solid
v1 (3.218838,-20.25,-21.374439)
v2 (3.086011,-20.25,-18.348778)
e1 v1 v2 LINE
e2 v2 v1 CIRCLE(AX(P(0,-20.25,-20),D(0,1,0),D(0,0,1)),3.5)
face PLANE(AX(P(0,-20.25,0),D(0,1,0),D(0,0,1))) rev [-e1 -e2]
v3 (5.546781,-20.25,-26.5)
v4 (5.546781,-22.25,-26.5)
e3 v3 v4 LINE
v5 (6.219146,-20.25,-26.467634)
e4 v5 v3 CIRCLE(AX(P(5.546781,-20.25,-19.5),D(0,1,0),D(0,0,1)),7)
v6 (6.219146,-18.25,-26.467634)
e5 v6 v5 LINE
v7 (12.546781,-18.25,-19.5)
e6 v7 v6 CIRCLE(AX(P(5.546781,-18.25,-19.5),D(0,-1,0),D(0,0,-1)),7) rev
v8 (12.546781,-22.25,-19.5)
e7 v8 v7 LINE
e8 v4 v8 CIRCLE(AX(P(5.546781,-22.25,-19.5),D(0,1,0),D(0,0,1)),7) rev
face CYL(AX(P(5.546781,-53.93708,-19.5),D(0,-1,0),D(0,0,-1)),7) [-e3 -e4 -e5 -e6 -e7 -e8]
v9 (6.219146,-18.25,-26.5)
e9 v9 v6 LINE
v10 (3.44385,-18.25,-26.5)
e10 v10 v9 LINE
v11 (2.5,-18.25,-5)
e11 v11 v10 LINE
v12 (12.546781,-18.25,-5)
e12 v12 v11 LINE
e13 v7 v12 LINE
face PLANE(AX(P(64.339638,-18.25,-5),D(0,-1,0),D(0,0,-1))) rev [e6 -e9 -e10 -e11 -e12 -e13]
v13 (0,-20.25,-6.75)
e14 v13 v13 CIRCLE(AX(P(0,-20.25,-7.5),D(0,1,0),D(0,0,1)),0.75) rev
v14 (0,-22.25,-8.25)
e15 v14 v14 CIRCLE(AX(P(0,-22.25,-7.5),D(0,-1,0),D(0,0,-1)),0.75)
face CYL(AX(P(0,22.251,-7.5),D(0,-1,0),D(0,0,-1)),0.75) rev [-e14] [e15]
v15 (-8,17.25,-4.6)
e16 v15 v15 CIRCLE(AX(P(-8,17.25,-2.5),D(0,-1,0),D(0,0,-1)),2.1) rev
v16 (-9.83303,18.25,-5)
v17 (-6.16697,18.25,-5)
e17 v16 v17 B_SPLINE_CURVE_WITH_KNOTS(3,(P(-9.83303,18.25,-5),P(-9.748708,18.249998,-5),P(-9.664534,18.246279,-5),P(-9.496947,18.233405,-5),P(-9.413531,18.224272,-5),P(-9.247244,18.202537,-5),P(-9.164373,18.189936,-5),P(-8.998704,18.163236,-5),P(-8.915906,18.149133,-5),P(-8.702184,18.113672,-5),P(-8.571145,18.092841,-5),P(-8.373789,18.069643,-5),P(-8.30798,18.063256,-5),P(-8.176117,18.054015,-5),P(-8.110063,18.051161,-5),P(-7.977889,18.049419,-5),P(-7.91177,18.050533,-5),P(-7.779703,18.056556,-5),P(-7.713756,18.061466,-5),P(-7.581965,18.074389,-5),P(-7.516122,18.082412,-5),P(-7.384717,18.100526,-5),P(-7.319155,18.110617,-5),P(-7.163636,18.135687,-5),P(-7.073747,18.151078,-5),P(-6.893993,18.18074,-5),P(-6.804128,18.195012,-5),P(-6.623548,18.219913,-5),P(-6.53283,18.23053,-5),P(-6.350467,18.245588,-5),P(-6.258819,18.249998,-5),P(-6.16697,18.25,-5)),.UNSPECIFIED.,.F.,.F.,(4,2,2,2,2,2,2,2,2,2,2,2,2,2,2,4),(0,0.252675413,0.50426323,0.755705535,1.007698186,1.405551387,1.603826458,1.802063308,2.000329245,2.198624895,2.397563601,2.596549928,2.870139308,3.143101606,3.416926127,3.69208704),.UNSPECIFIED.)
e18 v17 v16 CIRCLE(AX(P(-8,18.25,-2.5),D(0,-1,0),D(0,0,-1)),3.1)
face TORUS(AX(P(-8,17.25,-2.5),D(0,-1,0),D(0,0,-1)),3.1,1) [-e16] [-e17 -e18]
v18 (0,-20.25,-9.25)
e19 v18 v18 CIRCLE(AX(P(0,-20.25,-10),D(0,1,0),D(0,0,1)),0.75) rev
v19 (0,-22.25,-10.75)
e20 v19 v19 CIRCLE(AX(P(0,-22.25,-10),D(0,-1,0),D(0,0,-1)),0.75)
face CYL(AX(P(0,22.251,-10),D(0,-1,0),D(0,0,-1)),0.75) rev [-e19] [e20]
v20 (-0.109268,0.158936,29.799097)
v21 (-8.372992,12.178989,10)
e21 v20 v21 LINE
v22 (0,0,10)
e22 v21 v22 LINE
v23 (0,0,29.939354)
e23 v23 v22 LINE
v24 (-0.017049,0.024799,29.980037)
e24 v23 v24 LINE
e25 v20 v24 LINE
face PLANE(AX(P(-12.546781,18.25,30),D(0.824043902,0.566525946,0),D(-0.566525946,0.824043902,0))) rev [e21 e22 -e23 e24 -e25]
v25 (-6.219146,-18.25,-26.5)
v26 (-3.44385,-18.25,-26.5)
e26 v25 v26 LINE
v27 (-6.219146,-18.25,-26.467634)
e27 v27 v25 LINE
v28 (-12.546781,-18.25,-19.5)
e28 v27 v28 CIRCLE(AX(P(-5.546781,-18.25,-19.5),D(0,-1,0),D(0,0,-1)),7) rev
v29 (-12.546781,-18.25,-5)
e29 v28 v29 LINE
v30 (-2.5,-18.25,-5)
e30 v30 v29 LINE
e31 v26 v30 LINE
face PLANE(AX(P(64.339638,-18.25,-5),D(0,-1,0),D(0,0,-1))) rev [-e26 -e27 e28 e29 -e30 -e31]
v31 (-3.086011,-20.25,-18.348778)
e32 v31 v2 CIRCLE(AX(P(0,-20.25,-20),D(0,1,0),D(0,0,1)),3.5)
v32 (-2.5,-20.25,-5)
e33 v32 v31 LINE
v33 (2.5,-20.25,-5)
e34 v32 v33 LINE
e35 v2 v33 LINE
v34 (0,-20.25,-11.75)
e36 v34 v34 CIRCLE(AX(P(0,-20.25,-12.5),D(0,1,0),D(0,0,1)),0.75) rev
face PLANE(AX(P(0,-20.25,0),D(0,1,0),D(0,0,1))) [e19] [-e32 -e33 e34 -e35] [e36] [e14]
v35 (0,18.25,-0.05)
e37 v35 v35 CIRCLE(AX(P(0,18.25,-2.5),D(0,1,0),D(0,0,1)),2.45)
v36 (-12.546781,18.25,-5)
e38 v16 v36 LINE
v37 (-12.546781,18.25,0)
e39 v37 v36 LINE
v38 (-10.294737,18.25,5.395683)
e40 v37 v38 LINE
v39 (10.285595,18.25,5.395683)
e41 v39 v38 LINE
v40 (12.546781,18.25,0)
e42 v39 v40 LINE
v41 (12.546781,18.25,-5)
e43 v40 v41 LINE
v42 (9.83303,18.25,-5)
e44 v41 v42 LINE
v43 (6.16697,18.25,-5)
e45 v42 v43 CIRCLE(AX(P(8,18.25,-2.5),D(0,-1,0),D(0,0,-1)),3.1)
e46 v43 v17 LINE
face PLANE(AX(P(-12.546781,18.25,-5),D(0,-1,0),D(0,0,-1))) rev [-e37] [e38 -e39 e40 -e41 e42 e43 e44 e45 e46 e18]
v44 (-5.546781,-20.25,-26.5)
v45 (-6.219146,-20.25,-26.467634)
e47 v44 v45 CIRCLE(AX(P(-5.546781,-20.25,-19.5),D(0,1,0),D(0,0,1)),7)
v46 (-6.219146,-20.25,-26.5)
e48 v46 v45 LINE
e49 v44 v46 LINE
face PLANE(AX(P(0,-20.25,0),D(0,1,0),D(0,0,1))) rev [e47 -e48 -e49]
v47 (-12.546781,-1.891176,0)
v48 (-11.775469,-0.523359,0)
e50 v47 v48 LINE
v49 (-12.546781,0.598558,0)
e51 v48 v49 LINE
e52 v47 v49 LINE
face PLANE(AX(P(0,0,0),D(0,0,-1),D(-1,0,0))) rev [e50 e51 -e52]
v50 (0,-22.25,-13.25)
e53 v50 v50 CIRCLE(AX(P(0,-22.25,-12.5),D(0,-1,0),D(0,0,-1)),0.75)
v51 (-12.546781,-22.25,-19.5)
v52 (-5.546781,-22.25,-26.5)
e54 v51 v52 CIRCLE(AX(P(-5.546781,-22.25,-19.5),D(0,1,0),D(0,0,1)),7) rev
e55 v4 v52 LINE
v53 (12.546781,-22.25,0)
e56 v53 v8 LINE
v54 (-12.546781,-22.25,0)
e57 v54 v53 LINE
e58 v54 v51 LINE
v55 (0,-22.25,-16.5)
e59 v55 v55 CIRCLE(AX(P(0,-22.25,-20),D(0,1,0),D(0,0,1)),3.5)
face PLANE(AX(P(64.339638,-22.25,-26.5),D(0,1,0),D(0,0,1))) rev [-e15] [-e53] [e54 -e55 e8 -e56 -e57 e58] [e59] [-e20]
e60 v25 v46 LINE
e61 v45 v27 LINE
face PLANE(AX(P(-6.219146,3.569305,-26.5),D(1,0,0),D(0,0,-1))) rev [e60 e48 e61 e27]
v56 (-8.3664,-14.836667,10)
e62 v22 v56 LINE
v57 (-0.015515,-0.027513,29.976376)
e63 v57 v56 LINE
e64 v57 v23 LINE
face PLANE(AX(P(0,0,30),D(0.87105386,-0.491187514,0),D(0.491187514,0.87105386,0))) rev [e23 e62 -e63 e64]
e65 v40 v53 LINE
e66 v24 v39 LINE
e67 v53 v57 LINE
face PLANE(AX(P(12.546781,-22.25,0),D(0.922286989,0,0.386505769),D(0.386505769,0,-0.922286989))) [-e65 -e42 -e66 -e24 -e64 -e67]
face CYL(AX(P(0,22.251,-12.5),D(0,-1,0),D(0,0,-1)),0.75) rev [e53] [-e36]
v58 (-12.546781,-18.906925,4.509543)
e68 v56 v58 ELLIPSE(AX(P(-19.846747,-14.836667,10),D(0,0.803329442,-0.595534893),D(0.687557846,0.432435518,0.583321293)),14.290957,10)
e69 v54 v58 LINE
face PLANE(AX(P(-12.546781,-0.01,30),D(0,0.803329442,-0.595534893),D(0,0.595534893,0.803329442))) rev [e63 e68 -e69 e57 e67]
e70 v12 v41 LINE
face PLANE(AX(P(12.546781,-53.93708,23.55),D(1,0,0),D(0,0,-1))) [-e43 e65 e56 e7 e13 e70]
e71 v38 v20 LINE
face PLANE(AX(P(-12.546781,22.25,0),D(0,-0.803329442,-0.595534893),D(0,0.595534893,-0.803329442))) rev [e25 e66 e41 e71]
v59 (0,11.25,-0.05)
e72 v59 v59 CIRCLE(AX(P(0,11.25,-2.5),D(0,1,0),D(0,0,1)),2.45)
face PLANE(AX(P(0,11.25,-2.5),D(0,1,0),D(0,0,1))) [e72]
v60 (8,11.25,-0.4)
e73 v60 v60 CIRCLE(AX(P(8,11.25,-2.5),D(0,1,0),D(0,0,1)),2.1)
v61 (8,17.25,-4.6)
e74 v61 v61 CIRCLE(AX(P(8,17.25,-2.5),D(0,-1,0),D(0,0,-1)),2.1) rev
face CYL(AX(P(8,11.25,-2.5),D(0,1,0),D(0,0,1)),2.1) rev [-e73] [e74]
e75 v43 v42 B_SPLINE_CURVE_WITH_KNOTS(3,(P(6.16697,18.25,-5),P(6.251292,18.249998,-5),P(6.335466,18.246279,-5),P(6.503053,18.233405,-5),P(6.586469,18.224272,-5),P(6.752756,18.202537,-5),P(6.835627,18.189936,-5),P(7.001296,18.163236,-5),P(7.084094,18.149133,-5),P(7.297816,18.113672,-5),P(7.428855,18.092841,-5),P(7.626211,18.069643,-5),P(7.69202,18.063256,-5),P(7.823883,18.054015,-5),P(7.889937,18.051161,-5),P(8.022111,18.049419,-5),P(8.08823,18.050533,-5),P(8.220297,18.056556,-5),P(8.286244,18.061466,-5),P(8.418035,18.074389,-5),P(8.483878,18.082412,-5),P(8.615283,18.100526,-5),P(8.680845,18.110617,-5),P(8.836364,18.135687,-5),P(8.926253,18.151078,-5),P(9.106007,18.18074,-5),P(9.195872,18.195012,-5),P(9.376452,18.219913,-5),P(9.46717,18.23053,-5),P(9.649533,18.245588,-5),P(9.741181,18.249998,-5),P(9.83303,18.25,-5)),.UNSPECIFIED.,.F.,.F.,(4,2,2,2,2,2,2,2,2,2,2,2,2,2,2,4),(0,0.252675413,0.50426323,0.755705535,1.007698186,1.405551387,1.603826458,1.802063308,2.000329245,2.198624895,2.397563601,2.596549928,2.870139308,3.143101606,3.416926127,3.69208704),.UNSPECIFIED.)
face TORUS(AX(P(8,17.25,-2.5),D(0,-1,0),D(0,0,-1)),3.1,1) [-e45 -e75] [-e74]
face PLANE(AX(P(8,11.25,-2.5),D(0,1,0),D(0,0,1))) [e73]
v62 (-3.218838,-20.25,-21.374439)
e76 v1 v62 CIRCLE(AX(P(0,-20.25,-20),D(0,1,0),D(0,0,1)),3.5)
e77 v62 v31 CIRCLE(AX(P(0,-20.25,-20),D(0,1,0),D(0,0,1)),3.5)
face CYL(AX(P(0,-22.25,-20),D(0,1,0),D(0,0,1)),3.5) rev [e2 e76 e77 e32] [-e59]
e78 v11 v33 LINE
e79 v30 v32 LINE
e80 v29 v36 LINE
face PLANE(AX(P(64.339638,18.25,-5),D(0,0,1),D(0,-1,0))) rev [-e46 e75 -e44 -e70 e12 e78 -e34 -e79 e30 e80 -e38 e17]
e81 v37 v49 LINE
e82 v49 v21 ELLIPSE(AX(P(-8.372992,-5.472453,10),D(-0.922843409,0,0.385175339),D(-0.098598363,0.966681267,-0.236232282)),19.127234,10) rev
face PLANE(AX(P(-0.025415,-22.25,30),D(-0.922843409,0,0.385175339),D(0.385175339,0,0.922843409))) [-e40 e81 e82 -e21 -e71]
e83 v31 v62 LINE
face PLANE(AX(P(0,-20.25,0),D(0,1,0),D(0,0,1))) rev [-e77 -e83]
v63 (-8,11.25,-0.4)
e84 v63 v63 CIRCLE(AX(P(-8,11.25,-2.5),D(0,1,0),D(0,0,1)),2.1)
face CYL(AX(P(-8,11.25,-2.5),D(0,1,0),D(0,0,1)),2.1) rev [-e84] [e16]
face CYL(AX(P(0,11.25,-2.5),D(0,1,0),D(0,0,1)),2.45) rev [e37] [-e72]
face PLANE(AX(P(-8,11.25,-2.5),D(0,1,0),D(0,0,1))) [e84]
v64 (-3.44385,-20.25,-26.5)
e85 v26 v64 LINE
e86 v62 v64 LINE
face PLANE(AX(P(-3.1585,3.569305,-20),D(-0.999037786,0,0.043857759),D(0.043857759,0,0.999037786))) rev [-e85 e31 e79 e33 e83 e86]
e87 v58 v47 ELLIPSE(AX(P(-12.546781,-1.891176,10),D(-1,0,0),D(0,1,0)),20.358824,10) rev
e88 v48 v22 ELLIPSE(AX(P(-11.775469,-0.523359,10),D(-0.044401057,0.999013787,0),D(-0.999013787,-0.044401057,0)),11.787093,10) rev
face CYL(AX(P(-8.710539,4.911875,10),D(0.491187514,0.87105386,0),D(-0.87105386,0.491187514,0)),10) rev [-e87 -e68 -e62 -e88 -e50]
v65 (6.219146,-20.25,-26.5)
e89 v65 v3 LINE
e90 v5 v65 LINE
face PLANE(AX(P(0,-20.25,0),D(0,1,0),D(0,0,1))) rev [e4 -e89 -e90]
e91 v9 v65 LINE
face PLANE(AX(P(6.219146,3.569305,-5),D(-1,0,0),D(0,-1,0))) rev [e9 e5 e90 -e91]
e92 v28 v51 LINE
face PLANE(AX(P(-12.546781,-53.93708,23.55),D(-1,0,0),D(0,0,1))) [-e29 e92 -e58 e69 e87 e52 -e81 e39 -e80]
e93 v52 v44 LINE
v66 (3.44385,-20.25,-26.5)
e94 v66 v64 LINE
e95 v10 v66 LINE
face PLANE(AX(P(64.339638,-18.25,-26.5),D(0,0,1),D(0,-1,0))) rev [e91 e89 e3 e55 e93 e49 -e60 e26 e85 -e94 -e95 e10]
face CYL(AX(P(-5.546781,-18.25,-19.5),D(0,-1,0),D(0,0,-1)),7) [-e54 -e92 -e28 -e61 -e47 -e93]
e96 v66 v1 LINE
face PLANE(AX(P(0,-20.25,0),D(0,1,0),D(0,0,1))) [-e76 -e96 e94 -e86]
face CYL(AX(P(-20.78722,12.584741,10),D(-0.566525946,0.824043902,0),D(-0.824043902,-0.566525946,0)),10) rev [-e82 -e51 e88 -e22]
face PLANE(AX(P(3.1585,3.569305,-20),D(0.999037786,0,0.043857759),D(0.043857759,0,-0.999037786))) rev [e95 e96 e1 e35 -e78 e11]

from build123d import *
from OCP.BRepFilletAPI import BRepFilletAPI_MakeChamfer

# Parameters (mm, degrees)
SKETCH4_W                = 12.46
SKETCH4_H                = 17.25
BOSS_EXTRUDE3_DEPTH      = 6
BOSS_EXTRUDE6_DEPTH      = 7.3
BOSS_EXTRUDE6_DEPTH_BACK = 17.25
SKETCH8_R                = 12.546781182
SKETCH8_R_2              = 11.15
BOSS_EXTRUDE4_DEPTH      = 17.25
SKETCH6_R                = 2
CUT_EXTRUDE1_DEPTH       = 5
CHAMFER1_SIZE            = 0.5
CHAMFER1_SIZE_2          = 0.866025404
SKETCH10_W               = 12.46
SKETCH10_H               = 23.7
CUT_EXTRUDE3_DEPTH       = 17.25
CUT_EXTRUDE4_REACH       = 43.938
SKETCH11_W               = 5
SKETCH11_H               = 3
BOSS_EXTRUDE7_START      = -7.3
BOSS_EXTRUDE7_DEPTH      = 7.3
BOSS_EXTRUDE9_START      = 10
BOSS_EXTRUDE9_DEPTH      = 10
BOSS_EXTRUDE10_DEPTH     = 25.093562364
SKETCH18_W               = 21.5
SKETCH18_H               = 12.438292938
CUT_EXTRUDE5_DEPTH       = 2
CUT_EXTRUDE6_DEPTH       = 58.154608998
CUT_EXTRUDE6_DEPTH_BACK  = 58.154608998
SKETCH19_R               = 3.5
FILLET1_R                = 7
CUT_EXTRUDE7_DEPTH       = 55.97840444
CUT_EXTRUDE7_DEPTH_BACK  = 55.97840444
SKETCH20_W               = 25.093562364
SKETCH20_H               = 36.096781182
BOSS_EXTRUDE11_DEPTH     = 44.5
CUT_EXTRUDE8_DEPTH       = 40.401576339
CUT_EXTRUDE8_DEPTH_BACK  = 40.401576339
CUT_EXTRUDE9_DEPTH       = 40.401576339
SKETCH24_R               = 6.5
BOSS_EXTRUDE12_DEPTH     = 5
SKETCH25_R               = 6.075
BOSS_EXTRUDE13_DEPTH     = 5
FILLET2_R                = 1
BOSS_EXTRUDE14_DEPTH     = 2
CUT_EXTRUDE10_REACH      = 57.104
SKETCH27_R               = 0.75
CUT_EXTRUDE11_DEPTH      = 45.983908275
SKETCH29_R               = 2.1
SKETCH29_R_2             = 2.45
CUT_EXTRUDE12_DEPTH      = 7
FILLET3_R                = 10
FILLET4_R                = 1


# Some blends are built 0.0001 mm under size
with BuildPart() as part:
    # Sketch4 → Boss-Extrude3 (new body)
    with BuildSketch(Plane.XY):
        with Locations((0, -1.35)):
            Rectangle(SKETCH4_W, SKETCH4_H)
    extrude(amount=BOSS_EXTRUDE3_DEPTH)



with BuildPart() as body_2:
    # Sketch8 → Boss-Extrude6 (new, two sides: drawn at the far end of the back side and taken through both)
    with BuildSketch(Plane(origin=(0, -9.975, 0), x_dir=(-1, 0, 0), z_dir=(0, -1, 0)).offset(-BOSS_EXTRUDE6_DEPTH_BACK)):
        with Locations(Location((0, -23.55, 0), (0, 0, 90))):
            Circle(SKETCH8_R)
        with Locations(Location((0, -23.55, 0), (0, 0, 90))):
            Circle(SKETCH8_R_2, mode=Mode.SUBTRACT)
    extrude(amount=BOSS_EXTRUDE6_DEPTH + BOSS_EXTRUDE6_DEPTH_BACK)


with BuildPart() as part_1:
    add(part.part)

    add(body_2.part)  # Boss-Extrude4 merges body 2
    # Sketch5 → Boss-Extrude4 (add)
    with BuildSketch(Plane(origin=(0, 7.275, 0), x_dir=(1, 0, 0), z_dir=(0, 1, 0))):
        with BuildLine():
            Line((12.546781182, -23.55), (12.546781182, 0))
            Line((12.546781182, 0), (6.23, 0))
            Line((6.23, 0), (6.23, -29.7))
            Line((6.23, -29.7), (-6.23, -29.7))
            Line((-6.23, -29.7), (-6.23, 0))
            Line((-6.23, 0), (-12.546781182, 0))
            Line((-12.546781182, 0), (-12.546781182, -23.55))
            ThreePointArc((-12.546781182, -23.55), (0, -36.096781182), (12.546781182, -23.55))
        make_face()
    extrude(amount=-BOSS_EXTRUDE4_DEPTH)

    # Sketch6 → Cut-Extrude1 (cut)
    with BuildSketch(Plane(origin=(0, 7.275, 0), x_dir=(1, 0, 0), z_dir=(0, 1, 0))):
        with Locations(Location((0, -3.5, 0), (0, 0, 270))):
            Circle(SKETCH6_R)
        with Locations(Location((0, -32.2, 0), (0, 0, 270))):
            Circle(SKETCH6_R)
    extrude(amount=-CUT_EXTRUDE1_DEPTH, mode=Mode.SUBTRACT)

    # Chamfer1
    chamfer1_edges_1 = [part_1.edges().sort_by_distance(p)[0] for p in [
        (0, 7.275, 1.5),
    ]]
    chamfer1_side_1 = [part_1.faces().sort_by_distance(p)[0] for p in [
        (0, 7.275, 1.49),
    ]]
    chamfer1_edges_2 = [part_1.edges().sort_by_distance(p)[0] for p in [
        (0, 7.275, 30.2),
    ]]
    chamfer1_side_2 = [part_1.faces().sort_by_distance(p)[0] for p in [
        (0, 7.275, 30.19),
    ]]
    chamfer1 = BRepFilletAPI_MakeChamfer(part_1.part.solid().wrapped)
    for e in chamfer1_edges_1:
        chamfer1.Add(CHAMFER1_SIZE - 0.0001, CHAMFER1_SIZE_2 - 0.0001, e.wrapped, chamfer1_side_1[0].wrapped)
    for e in chamfer1_edges_2:
        chamfer1.Add(CHAMFER1_SIZE - 0.0001, CHAMFER1_SIZE_2 - 0.0001, e.wrapped, chamfer1_side_2[0].wrapped)
    add(Compound.cast(chamfer1.Shape()), mode=Mode.REPLACE)  # a hair under: the kernel refuses the full size

    # Sketch10 → Cut-Extrude3 (cut)
    with BuildSketch(Plane(origin=(0, 7.275, 0), x_dir=(1, 0, 0), z_dir=(0, 1, 0))):
        with Locations((0, -17.85)):
            Rectangle(SKETCH10_W, SKETCH10_H)
    extrude(amount=-CUT_EXTRUDE3_DEPTH, mode=Mode.SUBTRACT)

    # Sketch11 → Cut-Extrude4 (cut, up to next)
    with BuildSketch(Plane.XY.offset(36.096781182), mode=Mode.PRIVATE) as cut_extrude4_sk1:
        with Locations((0, -8.475)):
            Rectangle(SKETCH11_W, SKETCH11_H)
    cut_extrude4_tool1 = extrude(cut_extrude4_sk1.sketch, amount=-CUT_EXTRUDE4_REACH, mode=Mode.PRIVATE) & part_1.part
    add(cut_extrude4_tool1.solids().sort_by_distance((0, -8.475, 36.096781))[0], mode=Mode.SUBTRACT)

    # Sketch13 → Boss-Extrude7 (add)
    with BuildSketch(Plane.XZ.offset(17.275).offset(BOSS_EXTRUDE7_START)):
        with BuildLine():
            Line((-12.546781182, 23.55), (-12.546781182, 0))
            Line((-12.546781182, 0), (12.546781182, 0))
            Line((12.546781182, 0), (12.546781182, 23.55))
            ThreePointArc((12.546781182, 23.55), (0, 11.003218818), (-12.546781182, 23.55))
        make_face()
    extrude(amount=BOSS_EXTRUDE7_DEPTH)

    # Sketch15 → Boss-Extrude9 (add)
    with BuildSketch(Plane(origin=(0, 7.275, 0), x_dir=(1, 0, 0), z_dir=(0, 1, 0)).offset(BOSS_EXTRUDE9_START)):
        with BuildLine():
            Line((-12.546781182, 0), (12.546781182, 0))
            Line((12.546781182, 0), (12.546781182, -23.55))
            ThreePointArc((12.546781182, -23.55), (0, -36.096781182), (-12.546781182, -23.55))
            Line((-12.546781182, -23.55), (-12.546781182, 0))
        make_face()
        with BuildLine():
            Line((-6.23, -0.8), (6.23, -0.8))
            Line((6.23, -0.8), (6.23, -33.5))
            ThreePointArc((6.23, -33.5), (5.937106781, -34.207106781), (5.23, -34.5))
            Line((5.23, -34.5), (-5.23, -34.5))
            ThreePointArc((-5.23, -34.5), (-5.937106781, -34.207106781), (-6.23, -33.5))
            Line((-6.23, -33.5), (-6.23, -0.8))
        make_face(mode=Mode.SUBTRACT)
    extrude(amount=-BOSS_EXTRUDE9_DEPTH)

    # Sketch17 → Boss-Extrude10 (add)
    with BuildSketch(Plane(origin=(-12.546781182, 4.728218818, 0), x_dir=(0, -1, 0), z_dir=(1, 0, 0))):
        Polygon((26.978218818, 26.5), (26.978218818, 0), (-17.521781182, 0), (-17.521781182, 26.5), (-13.521781182, 26.5), (-13.521781182, 5), (22.978218818, 5), (22.978218818, 26.5), align=None)
    extrude(amount=BOSS_EXTRUDE10_DEPTH)

    # Sketch18 → Cut-Extrude5 (cut)
    with BuildSketch(Plane.ZX.offset(-18.25)):
        with Locations((-15.75, 0)):
            Rectangle(SKETCH18_W, SKETCH18_H)
    extrude(amount=-CUT_EXTRUDE5_DEPTH, mode=Mode.SUBTRACT)

    # Sketch19 → Cut-Extrude6 (cut, two sides: drawn at the far end of the back side and taken through both)
    with BuildSketch(Plane.ZX.offset(-20.25).offset(-CUT_EXTRUDE6_DEPTH_BACK)):
        with Locations((-20, 0)):
            Circle(SKETCH19_R)
    extrude(amount=CUT_EXTRUDE6_DEPTH + CUT_EXTRUDE6_DEPTH_BACK, mode=Mode.SUBTRACT)

    # Fillet1
    fillet1_edges = [part_1.edges().sort_by_distance(p)[0] for p in [
        (12.546781182, -20.25, -26.5),
        (-12.546781182, -20.25, -26.5),
        (-12.546781182, 20.25, -26.5),
        (12.546781182, 20.25, -26.5),
    ]]
    fillet(fillet1_edges, radius=FILLET1_R)

    # Sketch20 → Cut-Extrude7 (cut, two sides: drawn at the far end of the back side and taken through both)
    with BuildSketch(Plane(origin=(0, 17.275, 0), x_dir=(1, 0, 0), z_dir=(0, 1, 0)).offset(-CUT_EXTRUDE7_DEPTH_BACK)):
        with Locations((0, -18.048390591)):
            Rectangle(SKETCH20_W, SKETCH20_H)
    extrude(amount=CUT_EXTRUDE7_DEPTH + CUT_EXTRUDE7_DEPTH_BACK, mode=Mode.SUBTRACT)

    # Sketch21 → Boss-Extrude11 (add)
    with BuildSketch(Plane(origin=(0, 22.25, 0), x_dir=(1, 0, 0), z_dir=(0, 1, 0))):
        Polygon((12.546781182, 0), (-0.025415104, -30), (-12.546781182, 0), align=None)
    extrude(amount=-BOSS_EXTRUDE11_DEPTH)

    # Sketch22 → Cut-Extrude8 (cut, two sides: drawn at the far end of the back side and taken through both)
    with BuildSketch(Plane(origin=(0, 0, 0), x_dir=(0, 0, -1), z_dir=(1, 0, 0)).offset(-CUT_EXTRUDE8_DEPTH_BACK)):
        Polygon((0, 22.25), (-30, 0.01), (-30, 22.25), align=None)
        Polygon((0, -22.25), (-30, -22.25), (-30, -0.01), align=None)
    extrude(amount=CUT_EXTRUDE8_DEPTH + CUT_EXTRUDE8_DEPTH_BACK, mode=Mode.SUBTRACT)

    # Sketch23 → Cut-Extrude9 (cut, through all)
    with BuildSketch(Plane(origin=(0, 0, 0), x_dir=(-1, 0, 0), z_dir=(0, 0, -1))):
        Polygon((12.546781182, 18.25), (0, 0), (12.546781182, -22.25), align=None)
    extrude(amount=-CUT_EXTRUDE9_DEPTH, mode=Mode.SUBTRACT)

    # Sketch24 → Boss-Extrude12 (add)
    with BuildSketch(Plane(origin=(0, 22.25, 0), x_dir=(1, 0, 0), z_dir=(0, 1, 0))):
        with Locations(Location((0, 20, 0), (0, 0, 270))):
            Circle(SKETCH24_R)
    extrude(amount=-BOSS_EXTRUDE12_DEPTH)

    # Sketch25 → Boss-Extrude13 (add)
    with BuildSketch(Plane.XZ.offset(-17.25)):
        with Locations(Location((0, -20, 0), (0, 0, 270))):
            Circle(SKETCH25_R)
    extrude(amount=BOSS_EXTRUDE13_DEPTH)

    # Fillet2
    fillet2_edges = [part_1.edges().sort_by_distance(p)[0] for p in [
        (0, 12.25, -13.925),
    ]]
    fillet(fillet2_edges, radius=FILLET2_R)

    # Sketch26 → Boss-Extrude14 (add)
    with BuildSketch(Plane(origin=(0, -20.25, 0), x_dir=(1, 0, 0), z_dir=(0, 1, 0))):
        Polygon((-6.219146469, 5), (-2.5, 5), (-3.1585, 20), (-3.44385, 26.5), (-6.219146469, 26.5), align=None)
        Polygon((3.1585, 20), (3.44385, 26.5), (6.219146469, 26.5), (6.219146469, 5), (2.5, 5), align=None)
    extrude(amount=BOSS_EXTRUDE14_DEPTH)

    # Sketch27 → Cut-Extrude10 (cut, up to next)
    with BuildSketch(Plane.XZ.offset(22.25), mode=Mode.PRIVATE) as cut_extrude10_sk1:
        with Locations(Location((0, -10, 0), (0, 0, 270))):
            Circle(SKETCH27_R)
    cut_extrude10_tool1 = extrude(cut_extrude10_sk1.sketch, amount=-CUT_EXTRUDE10_REACH, mode=Mode.PRIVATE) & part_1.part
    # Sketch27 → Cut-Extrude10 (cut, up to next)
    with BuildSketch(Plane.XZ.offset(22.25), mode=Mode.PRIVATE) as cut_extrude10_sk2:
        with Locations(Location((0, -7.5, 0), (0, 0, 270))):
            Circle(SKETCH27_R)
    cut_extrude10_tool2 = extrude(cut_extrude10_sk2.sketch, amount=-CUT_EXTRUDE10_REACH, mode=Mode.PRIVATE) & part_1.part
    # Sketch27 → Cut-Extrude10 (cut, up to next)
    with BuildSketch(Plane.XZ.offset(22.25), mode=Mode.PRIVATE) as cut_extrude10_sk3:
        with Locations(Location((0, -12.5, 0), (0, 0, 270))):
            Circle(SKETCH27_R)
    cut_extrude10_tool3 = extrude(cut_extrude10_sk3.sketch, amount=-CUT_EXTRUDE10_REACH, mode=Mode.PRIVATE) & part_1.part
    add(cut_extrude10_tool1.solids().sort_by_distance((0, -22.25, -10))[0], mode=Mode.SUBTRACT)
    add(cut_extrude10_tool2.solids().sort_by_distance((0, -22.25, -7.5))[0], mode=Mode.SUBTRACT)
    add(cut_extrude10_tool3.solids().sort_by_distance((0, -22.25, -12.5))[0], mode=Mode.SUBTRACT)

    # Sketch28 → Cut-Extrude11 (cut, through all)
    with BuildSketch(Plane(origin=(12.546781182, 0, 0), x_dir=(0, 0, -1), z_dir=(1, 0, 0))):
        Polygon((5, 18.25), (-20.685656294, 18.25), (-20.685656294, 31.083718117), (38.29343765, 31.083718117), (38.29343765, 6.428054208), (5, 6.428054208), align=None)
    extrude(amount=-CUT_EXTRUDE11_DEPTH, mode=Mode.SUBTRACT)

    # Sketch29 → Cut-Extrude12 (cut)
    with BuildSketch(Plane(origin=(0, 18.25, 0), x_dir=(1, 0, 0), z_dir=(0, 1, 0))):
        with Locations(Location((-8, 2.5, 0), (0, 0, 270))):
            Circle(SKETCH29_R)
        with Locations(Location((0, 2.5, 0), (0, 0, 270))):
            Circle(SKETCH29_R_2)
        with Locations(Location((8, 2.5, 0), (0, 0, 270))):
            Circle(SKETCH29_R)
    extrude(amount=-CUT_EXTRUDE12_DEPTH, mode=Mode.SUBTRACT)

    # Fillet3
    # the kernel refuses this fillet: 10 mm, written as the material it adds along each edge
    with BuildSketch(Plane(origin=(-26.70992984, 38.851097546, 0), x_dir=(-0.8240439018220859, -0.566525946334175, 0), z_dir=(0.5665259463341751, -0.824043901822086, 0))) as fillet3_piece_1_section:
        with BuildLine():
            CenterArc((FILLET3_R, -FILLET3_R), FILLET3_R, 90, 90)
            Line((0, -FILLET3_R), (0, 0))
            Line((0, 0), (FILLET3_R, 0))
        make_face()
    fillet3_piece_1 = extrude(amount=72.146878291, mode=Mode.PRIVATE)
    fillet3_piece_1 = split(fillet3_piece_1, bisect_by=Plane(origin=(-10.851908464, 5.541742766, 4.060753532), z_dir=(0.9228434094782519, 0, -0.38517533875178916)), keep=Keep.TOP, mode=Mode.PRIVATE)
    fillet3_piece_1 = split(fillet3_piece_1, bisect_by=Plane(origin=(0.82769932, 1.467811513, 2.201310623), z_dir=(-0.8710538597344621, 0.49118751352380285, 0)), keep=Keep.TOP, mode=Mode.PRIVATE)
    add(fillet3_piece_1)
    with BuildSketch(Plane(origin=(12.279687838, 21.776346493, 0), x_dir=(-0.8710538597344621, 0.4911875135238028, 0), z_dir=(-0.49118751352380285, -0.8710538597344621, 0))) as fillet3_piece_2_section:
        with BuildLine():
            CenterArc((FILLET3_R, -FILLET3_R), FILLET3_R, 90, 90)
            Line((0, -FILLET3_R), (0, 0))
            Line((0, 0), (FILLET3_R, 0))
        make_face()
    fillet3_piece_2 = extrude(amount=75.543770631, mode=Mode.PRIVATE)
    fillet3_piece_2 = split(fillet3_piece_2, bisect_by=Plane(origin=(-12.546781182, -7.723342909, 2.248116877), z_dir=(1, 0, 0)), keep=Keep.TOP, mode=Mode.PRIVATE)
    fillet3_piece_2 = split(fillet3_piece_2, bisect_by=Plane(origin=(1.437353681, -2.090711896, 2.248116877), z_dir=(-0.8240439018220859, -0.566525946334175, 0)), keep=Keep.TOP, mode=Mode.PRIVATE)
    fillet3_piece_2 = split(fillet3_piece_2, bisect_by=Plane(origin=(-6.755625418, -16.022426329, 8.400504052), z_dir=(0, 0.8033294415309644, -0.5955348926549551)), keep=Keep.TOP, mode=Mode.PRIVATE)
    add(fillet3_piece_2)

    # Fillet4
    # the kernel refuses this fillet: 1 mm, written as the material it takes off along each edge
    with BuildSketch(Plane(origin=(-8, 18.25, -2.5), x_dir=(0, 0, 1), z_dir=(-1, 0, 0))) as fillet4_piece_1:
        with BuildLine():
            CenterArc((2.1 + FILLET4_R, -FILLET4_R), FILLET4_R, 90, 90)
            Line((2.1, -FILLET4_R), (2.1, 0))
            Line((2.1, 0), (2.1 + FILLET4_R, 0))
        make_face()
    revolve(axis=Axis((-8, 18.25, -2.5), (0, 1, 0)), mode=Mode.SUBTRACT)
    with BuildSketch(Plane(origin=(8, 18.25, -2.5), x_dir=(0, 0, 1), z_dir=(-1, 0, 0))) as fillet4_piece_2:
        with BuildLine():
            CenterArc((2.1 + FILLET4_R, -FILLET4_R), FILLET4_R, 90, 90)
            Line((2.1, -FILLET4_R), (2.1, 0))
            Line((2.1, 0), (2.1 + FILLET4_R, 0))
        make_face()
    revolve(axis=Axis((8, 18.25, -2.5), (0, 1, 0)), mode=Mode.SUBTRACT)


solid = part_1.part
